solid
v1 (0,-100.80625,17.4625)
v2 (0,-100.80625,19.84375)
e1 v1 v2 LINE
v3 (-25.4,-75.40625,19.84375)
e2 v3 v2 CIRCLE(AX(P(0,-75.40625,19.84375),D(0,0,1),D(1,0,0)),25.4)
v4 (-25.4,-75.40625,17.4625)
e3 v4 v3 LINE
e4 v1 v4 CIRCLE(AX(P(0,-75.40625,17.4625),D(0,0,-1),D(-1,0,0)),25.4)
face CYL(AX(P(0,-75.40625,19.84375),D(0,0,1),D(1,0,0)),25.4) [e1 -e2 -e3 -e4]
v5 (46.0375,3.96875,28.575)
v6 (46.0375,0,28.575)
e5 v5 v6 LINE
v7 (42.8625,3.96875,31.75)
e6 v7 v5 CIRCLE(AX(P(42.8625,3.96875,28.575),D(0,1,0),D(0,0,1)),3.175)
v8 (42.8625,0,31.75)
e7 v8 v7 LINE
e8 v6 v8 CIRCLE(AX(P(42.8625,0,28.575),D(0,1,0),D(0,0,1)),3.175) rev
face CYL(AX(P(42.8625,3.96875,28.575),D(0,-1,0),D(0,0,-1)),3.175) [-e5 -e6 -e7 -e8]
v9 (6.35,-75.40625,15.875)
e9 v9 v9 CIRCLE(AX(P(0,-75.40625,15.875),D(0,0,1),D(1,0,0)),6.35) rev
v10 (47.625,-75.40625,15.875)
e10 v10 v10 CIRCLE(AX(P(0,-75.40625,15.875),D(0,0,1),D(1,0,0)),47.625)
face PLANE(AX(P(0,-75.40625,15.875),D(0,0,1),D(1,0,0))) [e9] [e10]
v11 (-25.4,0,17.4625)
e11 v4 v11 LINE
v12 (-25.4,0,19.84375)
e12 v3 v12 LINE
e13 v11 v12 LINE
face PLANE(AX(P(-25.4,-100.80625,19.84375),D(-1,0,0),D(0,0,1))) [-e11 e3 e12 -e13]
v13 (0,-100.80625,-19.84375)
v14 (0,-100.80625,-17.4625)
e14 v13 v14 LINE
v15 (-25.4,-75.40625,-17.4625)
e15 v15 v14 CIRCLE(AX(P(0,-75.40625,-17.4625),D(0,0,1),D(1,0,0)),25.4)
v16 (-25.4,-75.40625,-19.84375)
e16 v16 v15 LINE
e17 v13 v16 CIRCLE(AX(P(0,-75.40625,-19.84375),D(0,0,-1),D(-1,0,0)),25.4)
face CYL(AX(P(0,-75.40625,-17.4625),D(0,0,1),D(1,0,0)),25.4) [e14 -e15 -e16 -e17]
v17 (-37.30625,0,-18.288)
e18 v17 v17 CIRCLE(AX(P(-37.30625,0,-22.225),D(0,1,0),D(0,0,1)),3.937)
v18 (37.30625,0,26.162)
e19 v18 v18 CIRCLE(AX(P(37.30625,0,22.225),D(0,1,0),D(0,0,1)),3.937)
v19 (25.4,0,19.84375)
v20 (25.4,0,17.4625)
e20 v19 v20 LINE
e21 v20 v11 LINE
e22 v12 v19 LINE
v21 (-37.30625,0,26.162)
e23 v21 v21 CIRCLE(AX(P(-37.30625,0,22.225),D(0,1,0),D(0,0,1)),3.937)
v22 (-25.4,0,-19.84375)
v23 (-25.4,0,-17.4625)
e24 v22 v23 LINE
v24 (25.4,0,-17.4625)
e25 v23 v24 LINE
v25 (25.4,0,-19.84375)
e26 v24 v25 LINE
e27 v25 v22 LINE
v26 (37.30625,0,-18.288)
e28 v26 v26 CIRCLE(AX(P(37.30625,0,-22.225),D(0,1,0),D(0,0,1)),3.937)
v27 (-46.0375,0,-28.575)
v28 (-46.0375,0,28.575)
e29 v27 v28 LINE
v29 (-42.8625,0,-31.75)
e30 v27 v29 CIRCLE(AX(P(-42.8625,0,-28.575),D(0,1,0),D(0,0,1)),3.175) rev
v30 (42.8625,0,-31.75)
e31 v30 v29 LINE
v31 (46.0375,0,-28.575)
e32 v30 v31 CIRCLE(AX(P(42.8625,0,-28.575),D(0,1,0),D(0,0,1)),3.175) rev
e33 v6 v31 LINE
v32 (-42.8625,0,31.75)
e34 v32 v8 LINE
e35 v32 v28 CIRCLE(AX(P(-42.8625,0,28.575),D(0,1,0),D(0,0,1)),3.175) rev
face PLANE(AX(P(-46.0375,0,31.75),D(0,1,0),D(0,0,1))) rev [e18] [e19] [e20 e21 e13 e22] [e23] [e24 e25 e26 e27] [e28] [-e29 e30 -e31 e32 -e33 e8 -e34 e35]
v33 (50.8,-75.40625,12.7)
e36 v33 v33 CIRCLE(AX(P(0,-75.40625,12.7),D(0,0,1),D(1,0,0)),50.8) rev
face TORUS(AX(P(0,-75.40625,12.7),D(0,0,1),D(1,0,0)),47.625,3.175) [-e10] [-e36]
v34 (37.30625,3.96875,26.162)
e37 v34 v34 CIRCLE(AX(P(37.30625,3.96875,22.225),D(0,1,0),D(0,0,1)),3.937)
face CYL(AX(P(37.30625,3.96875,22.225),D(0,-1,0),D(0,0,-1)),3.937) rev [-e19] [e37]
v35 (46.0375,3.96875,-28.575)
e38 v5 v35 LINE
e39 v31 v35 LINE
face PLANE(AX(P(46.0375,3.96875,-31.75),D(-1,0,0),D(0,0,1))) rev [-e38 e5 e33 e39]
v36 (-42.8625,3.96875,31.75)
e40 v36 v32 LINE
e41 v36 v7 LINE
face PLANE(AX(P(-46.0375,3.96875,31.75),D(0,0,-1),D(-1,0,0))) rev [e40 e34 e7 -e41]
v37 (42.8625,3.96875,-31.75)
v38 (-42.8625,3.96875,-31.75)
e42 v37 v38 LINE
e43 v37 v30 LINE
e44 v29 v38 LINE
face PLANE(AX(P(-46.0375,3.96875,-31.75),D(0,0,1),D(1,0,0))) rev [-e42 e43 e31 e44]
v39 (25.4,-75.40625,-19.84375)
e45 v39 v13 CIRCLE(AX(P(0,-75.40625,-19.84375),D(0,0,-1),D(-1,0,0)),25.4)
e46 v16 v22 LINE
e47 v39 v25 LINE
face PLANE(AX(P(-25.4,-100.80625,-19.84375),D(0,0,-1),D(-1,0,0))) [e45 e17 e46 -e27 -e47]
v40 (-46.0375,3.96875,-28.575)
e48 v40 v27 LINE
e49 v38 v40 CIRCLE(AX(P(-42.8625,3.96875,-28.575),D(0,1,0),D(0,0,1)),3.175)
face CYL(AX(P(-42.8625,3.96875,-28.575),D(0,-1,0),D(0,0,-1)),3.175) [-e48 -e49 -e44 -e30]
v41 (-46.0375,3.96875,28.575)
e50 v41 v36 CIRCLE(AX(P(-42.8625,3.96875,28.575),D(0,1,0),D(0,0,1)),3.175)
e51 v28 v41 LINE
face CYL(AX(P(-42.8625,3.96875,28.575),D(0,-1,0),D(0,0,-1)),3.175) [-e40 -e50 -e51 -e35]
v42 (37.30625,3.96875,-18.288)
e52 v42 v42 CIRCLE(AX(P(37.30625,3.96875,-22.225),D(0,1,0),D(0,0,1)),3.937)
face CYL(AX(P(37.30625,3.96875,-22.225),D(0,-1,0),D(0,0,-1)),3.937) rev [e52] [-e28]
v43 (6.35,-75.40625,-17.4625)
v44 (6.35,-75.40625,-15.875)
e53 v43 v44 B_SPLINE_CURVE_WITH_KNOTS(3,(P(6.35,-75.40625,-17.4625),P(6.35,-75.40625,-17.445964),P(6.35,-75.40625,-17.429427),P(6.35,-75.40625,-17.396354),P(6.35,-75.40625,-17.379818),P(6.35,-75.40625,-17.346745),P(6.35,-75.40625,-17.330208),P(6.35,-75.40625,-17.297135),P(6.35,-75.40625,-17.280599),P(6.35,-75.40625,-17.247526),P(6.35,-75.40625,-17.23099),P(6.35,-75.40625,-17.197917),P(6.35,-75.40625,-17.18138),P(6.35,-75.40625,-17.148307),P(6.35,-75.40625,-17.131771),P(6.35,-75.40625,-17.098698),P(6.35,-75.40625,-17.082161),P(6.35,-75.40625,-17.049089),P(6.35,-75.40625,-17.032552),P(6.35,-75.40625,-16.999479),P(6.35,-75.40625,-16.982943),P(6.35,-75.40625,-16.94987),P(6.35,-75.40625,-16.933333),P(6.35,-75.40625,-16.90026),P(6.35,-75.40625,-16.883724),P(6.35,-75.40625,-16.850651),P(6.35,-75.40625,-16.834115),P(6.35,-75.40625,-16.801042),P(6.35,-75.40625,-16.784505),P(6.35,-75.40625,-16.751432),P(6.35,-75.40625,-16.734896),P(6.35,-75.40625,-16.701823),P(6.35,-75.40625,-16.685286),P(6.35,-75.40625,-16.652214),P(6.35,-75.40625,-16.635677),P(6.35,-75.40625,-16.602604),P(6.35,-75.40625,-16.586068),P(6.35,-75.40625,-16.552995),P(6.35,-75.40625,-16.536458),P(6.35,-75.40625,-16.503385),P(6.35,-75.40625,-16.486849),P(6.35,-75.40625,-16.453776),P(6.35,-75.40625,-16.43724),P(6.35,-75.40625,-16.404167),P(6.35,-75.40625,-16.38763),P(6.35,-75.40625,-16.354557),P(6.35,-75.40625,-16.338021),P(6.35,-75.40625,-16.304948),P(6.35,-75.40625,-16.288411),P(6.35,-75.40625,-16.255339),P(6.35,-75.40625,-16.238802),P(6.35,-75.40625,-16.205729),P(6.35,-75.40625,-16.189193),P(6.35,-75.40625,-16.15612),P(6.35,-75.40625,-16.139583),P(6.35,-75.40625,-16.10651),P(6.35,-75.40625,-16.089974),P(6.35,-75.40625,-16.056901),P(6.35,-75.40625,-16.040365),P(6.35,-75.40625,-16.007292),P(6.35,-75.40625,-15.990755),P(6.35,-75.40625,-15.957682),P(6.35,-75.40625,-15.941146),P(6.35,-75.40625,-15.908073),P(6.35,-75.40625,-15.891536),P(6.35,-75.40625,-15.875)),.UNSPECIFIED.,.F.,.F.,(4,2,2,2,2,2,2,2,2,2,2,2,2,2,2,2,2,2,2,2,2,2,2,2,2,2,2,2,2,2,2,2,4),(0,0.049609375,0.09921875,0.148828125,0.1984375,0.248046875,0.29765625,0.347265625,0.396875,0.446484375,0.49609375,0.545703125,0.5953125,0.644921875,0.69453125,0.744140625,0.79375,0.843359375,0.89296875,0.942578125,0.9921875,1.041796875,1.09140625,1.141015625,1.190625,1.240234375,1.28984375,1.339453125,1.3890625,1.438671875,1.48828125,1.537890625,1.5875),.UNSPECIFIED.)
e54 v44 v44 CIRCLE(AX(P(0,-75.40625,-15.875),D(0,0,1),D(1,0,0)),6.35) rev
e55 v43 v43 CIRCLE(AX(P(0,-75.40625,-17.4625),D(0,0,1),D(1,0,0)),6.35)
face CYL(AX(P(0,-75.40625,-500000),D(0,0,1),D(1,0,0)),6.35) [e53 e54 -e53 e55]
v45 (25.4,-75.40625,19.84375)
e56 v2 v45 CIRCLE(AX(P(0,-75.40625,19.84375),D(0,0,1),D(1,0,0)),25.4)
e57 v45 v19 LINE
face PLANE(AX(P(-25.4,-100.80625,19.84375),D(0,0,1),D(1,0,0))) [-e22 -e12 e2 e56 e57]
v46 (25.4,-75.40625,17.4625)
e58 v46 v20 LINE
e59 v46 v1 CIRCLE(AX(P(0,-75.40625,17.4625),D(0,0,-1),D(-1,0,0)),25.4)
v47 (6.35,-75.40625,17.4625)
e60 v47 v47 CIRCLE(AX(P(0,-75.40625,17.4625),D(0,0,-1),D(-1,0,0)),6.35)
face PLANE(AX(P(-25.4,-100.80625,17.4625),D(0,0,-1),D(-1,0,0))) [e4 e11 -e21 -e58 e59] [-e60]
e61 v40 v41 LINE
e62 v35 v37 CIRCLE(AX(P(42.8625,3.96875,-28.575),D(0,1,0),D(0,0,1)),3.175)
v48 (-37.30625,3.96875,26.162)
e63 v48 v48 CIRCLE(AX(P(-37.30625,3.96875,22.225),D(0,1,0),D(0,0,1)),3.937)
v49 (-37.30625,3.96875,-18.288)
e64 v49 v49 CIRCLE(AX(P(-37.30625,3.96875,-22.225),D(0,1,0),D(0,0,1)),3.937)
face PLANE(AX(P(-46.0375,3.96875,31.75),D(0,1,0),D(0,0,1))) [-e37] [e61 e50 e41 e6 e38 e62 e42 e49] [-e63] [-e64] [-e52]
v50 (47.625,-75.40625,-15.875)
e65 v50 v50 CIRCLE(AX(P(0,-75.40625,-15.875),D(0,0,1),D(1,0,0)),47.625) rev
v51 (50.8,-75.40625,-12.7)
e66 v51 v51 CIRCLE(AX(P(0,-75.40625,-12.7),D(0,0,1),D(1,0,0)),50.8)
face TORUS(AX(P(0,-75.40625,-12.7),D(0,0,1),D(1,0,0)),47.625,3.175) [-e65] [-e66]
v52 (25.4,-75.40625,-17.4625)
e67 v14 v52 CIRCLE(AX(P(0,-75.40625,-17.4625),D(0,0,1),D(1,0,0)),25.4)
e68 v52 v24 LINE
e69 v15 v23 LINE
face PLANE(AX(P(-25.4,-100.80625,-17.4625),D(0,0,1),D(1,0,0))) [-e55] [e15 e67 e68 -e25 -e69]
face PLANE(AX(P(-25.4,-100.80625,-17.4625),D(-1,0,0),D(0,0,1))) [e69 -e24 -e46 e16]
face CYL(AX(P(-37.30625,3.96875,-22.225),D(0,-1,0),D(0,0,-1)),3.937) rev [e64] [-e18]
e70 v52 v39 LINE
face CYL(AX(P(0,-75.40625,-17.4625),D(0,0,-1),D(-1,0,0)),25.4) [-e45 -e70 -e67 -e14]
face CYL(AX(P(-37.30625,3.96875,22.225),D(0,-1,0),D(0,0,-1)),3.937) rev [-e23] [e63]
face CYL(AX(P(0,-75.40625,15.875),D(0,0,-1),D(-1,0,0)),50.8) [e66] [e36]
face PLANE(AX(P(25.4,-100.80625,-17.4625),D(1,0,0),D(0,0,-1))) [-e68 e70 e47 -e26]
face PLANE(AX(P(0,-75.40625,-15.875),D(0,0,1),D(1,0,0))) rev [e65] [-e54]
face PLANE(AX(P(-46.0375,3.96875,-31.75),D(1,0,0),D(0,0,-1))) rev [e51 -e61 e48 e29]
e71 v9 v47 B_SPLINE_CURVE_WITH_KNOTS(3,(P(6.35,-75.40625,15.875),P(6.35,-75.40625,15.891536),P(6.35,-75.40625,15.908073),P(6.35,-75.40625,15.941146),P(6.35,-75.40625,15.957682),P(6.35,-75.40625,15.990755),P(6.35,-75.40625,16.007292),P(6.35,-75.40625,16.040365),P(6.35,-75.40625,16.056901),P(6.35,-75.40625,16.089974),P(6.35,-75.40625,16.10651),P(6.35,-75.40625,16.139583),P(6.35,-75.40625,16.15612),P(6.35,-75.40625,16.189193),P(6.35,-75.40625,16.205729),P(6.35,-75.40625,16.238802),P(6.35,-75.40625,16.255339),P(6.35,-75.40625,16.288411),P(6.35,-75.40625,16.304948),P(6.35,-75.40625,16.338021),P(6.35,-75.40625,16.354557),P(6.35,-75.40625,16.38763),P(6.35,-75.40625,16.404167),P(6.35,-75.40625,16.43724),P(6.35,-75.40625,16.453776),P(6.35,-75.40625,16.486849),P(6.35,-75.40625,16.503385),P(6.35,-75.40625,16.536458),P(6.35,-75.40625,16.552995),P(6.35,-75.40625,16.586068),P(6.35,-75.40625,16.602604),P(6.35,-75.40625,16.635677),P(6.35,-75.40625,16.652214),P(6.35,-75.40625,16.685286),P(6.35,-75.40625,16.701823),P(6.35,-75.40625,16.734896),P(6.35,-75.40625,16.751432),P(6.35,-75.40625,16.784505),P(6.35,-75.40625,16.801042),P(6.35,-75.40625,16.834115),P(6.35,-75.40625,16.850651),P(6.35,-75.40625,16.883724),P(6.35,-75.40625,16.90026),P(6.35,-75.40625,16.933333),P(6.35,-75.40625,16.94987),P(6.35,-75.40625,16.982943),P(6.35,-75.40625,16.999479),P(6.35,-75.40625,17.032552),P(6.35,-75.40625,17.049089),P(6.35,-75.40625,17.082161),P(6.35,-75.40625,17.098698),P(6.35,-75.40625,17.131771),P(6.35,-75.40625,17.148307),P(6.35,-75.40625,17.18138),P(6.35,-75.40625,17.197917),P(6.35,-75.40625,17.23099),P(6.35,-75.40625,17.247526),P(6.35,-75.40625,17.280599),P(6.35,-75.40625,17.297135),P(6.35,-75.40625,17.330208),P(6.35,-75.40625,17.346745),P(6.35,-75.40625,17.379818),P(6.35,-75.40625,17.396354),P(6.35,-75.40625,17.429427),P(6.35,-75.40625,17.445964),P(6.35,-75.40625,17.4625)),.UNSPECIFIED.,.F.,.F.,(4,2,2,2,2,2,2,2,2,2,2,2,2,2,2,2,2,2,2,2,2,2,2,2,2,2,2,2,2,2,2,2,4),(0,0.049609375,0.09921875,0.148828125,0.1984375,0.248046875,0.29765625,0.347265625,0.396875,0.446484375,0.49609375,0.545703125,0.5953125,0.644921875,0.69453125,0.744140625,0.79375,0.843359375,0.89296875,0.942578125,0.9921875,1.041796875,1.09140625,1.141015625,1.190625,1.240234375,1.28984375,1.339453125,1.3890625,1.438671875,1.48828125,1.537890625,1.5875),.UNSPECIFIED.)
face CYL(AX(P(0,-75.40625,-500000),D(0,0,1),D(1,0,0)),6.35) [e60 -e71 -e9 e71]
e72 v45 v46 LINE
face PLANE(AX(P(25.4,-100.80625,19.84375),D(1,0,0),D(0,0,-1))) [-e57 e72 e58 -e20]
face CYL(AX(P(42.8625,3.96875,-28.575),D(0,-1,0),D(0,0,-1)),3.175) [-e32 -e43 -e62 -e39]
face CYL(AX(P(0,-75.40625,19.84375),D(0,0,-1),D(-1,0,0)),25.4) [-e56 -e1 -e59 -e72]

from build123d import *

# Parameters (mm, degrees)
SKETCH1_W                  = 92.075
SKETCH1_H                  = 63.5
SKETCH1_R                  = 3.937
EXTRUDE1_DEPTH             = 3.96875
SKETCH2_W                  = 50.8
SKETCH2_H                  = 2.38125
EXTRUDE2_DEPTH             = 100.80625
FILLET1_R                  = 25.4
EXTRUDE3_REACH             = 117.28
SKETCH3_R                  = 6.35
EXTRUDE3_DIRECTION_2_REACH = 117.28
SKETCH4_R                  = 50.8
EXTRUDE4_DEPTH             = 15.875
FILLET2_R                  = 3.175
FILLET3_R                  = 3.175


with BuildPart() as part:
    # Sketch1 → Extrude1 (new body)
    with BuildSketch(Plane(origin=(0, 0, 0), x_dir=(1, 0, 0), z_dir=(0, 1, 0))):
        Rectangle(SKETCH1_W, SKETCH1_H)
        with Locations(Location((-37.30625, 22.225, 0), (0, 0, 270))):
            Circle(SKETCH1_R, mode=Mode.SUBTRACT)
        with Locations(Location((-37.30625, -22.225, 0), (0, 0, 270))):
            Circle(SKETCH1_R, mode=Mode.SUBTRACT)
        with Locations(Location((37.30625, -22.225, 0), (0, 0, 270))):
            Circle(SKETCH1_R, mode=Mode.SUBTRACT)
        with Locations(Location((37.30625, 22.225, 0), (0, 0, 270))):
            Circle(SKETCH1_R, mode=Mode.SUBTRACT)
    extrude(amount=EXTRUDE1_DEPTH)

    # Sketch2 → Extrude2 (add)
    with BuildSketch(Plane(origin=(0, 0, 0), x_dir=(-1, 0, 0), z_dir=(0, 1, 0))):
        with Locations((0, 18.653125)):
            Rectangle(SKETCH2_W, SKETCH2_H)
        with Locations((0, -18.653125)):
            Rectangle(SKETCH2_W, SKETCH2_H)
    extrude(amount=-EXTRUDE2_DEPTH)

    # Fillet1
    fillet1_edges = [part.edges().sort_by_distance(p)[0] for p in [
        (-25.4, -100.80625, 18.653125),
        (-25.4, -100.80625, -18.653125),
        (25.4, -100.80625, -18.653125),
        (25.4, -100.80625, 18.653125),
    ]]
    fillet(fillet1_edges, radius=FILLET1_R - 0.0001)  # a hair under: the kernel refuses the full size

    # Sketch3 → Extrude3 (add, up to next)
    with BuildSketch(Plane.XY, mode=Mode.PRIVATE) as extrude3_sk1:
        with Locations((0, -75.40625)):
            Circle(SKETCH3_R)
    extrude3_tool1 = extrude(extrude3_sk1.sketch, amount=EXTRUDE3_REACH, mode=Mode.PRIVATE) - part.part
    add(extrude3_tool1.solids().sort_by_distance((0, -75.40625, 0))[0])

    # Sketch3 → Extrude3 direction 2 (add, up to next)
    with BuildSketch(Plane.XY, mode=Mode.PRIVATE) as extrude3_direction_2_sk1:
        with Locations((0, -75.40625)):
            Circle(SKETCH3_R)
    extrude3_direction_2_tool1 = extrude(extrude3_direction_2_sk1.sketch, amount=-EXTRUDE3_DIRECTION_2_REACH, mode=Mode.PRIVATE) - part.part
    add(extrude3_direction_2_tool1.solids().sort_by_distance((0, -75.40625, 0))[0])

    # Sketch4 → Extrude4 (add, symmetric)
    with BuildSketch(Plane.XY):
        with Locations((0, -75.40625)):
            Circle(SKETCH4_R)
    extrude(amount=EXTRUDE4_DEPTH, both=True)

    # Fillet2
    fillet2_edges = [part.edges().sort_by_distance(p)[0] for p in [
        (-50.8, -75.40625, -15.875),
        (-50.8, -75.40625, 15.875),
    ]]
    fillet(fillet2_edges, radius=FILLET2_R)

    # Fillet3
    fillet3_edges = [part.edges().sort_by_distance(p)[0] for p in [
        (-46.0375, 1.984375, -31.75),
        (46.0375, 1.984375, -31.75),
        (46.0375, 1.984375, 31.75),
        (-46.0375, 1.984375, 31.75),
    ]]
    fillet(fillet3_edges, radius=FILLET3_R)


solid = part.part
